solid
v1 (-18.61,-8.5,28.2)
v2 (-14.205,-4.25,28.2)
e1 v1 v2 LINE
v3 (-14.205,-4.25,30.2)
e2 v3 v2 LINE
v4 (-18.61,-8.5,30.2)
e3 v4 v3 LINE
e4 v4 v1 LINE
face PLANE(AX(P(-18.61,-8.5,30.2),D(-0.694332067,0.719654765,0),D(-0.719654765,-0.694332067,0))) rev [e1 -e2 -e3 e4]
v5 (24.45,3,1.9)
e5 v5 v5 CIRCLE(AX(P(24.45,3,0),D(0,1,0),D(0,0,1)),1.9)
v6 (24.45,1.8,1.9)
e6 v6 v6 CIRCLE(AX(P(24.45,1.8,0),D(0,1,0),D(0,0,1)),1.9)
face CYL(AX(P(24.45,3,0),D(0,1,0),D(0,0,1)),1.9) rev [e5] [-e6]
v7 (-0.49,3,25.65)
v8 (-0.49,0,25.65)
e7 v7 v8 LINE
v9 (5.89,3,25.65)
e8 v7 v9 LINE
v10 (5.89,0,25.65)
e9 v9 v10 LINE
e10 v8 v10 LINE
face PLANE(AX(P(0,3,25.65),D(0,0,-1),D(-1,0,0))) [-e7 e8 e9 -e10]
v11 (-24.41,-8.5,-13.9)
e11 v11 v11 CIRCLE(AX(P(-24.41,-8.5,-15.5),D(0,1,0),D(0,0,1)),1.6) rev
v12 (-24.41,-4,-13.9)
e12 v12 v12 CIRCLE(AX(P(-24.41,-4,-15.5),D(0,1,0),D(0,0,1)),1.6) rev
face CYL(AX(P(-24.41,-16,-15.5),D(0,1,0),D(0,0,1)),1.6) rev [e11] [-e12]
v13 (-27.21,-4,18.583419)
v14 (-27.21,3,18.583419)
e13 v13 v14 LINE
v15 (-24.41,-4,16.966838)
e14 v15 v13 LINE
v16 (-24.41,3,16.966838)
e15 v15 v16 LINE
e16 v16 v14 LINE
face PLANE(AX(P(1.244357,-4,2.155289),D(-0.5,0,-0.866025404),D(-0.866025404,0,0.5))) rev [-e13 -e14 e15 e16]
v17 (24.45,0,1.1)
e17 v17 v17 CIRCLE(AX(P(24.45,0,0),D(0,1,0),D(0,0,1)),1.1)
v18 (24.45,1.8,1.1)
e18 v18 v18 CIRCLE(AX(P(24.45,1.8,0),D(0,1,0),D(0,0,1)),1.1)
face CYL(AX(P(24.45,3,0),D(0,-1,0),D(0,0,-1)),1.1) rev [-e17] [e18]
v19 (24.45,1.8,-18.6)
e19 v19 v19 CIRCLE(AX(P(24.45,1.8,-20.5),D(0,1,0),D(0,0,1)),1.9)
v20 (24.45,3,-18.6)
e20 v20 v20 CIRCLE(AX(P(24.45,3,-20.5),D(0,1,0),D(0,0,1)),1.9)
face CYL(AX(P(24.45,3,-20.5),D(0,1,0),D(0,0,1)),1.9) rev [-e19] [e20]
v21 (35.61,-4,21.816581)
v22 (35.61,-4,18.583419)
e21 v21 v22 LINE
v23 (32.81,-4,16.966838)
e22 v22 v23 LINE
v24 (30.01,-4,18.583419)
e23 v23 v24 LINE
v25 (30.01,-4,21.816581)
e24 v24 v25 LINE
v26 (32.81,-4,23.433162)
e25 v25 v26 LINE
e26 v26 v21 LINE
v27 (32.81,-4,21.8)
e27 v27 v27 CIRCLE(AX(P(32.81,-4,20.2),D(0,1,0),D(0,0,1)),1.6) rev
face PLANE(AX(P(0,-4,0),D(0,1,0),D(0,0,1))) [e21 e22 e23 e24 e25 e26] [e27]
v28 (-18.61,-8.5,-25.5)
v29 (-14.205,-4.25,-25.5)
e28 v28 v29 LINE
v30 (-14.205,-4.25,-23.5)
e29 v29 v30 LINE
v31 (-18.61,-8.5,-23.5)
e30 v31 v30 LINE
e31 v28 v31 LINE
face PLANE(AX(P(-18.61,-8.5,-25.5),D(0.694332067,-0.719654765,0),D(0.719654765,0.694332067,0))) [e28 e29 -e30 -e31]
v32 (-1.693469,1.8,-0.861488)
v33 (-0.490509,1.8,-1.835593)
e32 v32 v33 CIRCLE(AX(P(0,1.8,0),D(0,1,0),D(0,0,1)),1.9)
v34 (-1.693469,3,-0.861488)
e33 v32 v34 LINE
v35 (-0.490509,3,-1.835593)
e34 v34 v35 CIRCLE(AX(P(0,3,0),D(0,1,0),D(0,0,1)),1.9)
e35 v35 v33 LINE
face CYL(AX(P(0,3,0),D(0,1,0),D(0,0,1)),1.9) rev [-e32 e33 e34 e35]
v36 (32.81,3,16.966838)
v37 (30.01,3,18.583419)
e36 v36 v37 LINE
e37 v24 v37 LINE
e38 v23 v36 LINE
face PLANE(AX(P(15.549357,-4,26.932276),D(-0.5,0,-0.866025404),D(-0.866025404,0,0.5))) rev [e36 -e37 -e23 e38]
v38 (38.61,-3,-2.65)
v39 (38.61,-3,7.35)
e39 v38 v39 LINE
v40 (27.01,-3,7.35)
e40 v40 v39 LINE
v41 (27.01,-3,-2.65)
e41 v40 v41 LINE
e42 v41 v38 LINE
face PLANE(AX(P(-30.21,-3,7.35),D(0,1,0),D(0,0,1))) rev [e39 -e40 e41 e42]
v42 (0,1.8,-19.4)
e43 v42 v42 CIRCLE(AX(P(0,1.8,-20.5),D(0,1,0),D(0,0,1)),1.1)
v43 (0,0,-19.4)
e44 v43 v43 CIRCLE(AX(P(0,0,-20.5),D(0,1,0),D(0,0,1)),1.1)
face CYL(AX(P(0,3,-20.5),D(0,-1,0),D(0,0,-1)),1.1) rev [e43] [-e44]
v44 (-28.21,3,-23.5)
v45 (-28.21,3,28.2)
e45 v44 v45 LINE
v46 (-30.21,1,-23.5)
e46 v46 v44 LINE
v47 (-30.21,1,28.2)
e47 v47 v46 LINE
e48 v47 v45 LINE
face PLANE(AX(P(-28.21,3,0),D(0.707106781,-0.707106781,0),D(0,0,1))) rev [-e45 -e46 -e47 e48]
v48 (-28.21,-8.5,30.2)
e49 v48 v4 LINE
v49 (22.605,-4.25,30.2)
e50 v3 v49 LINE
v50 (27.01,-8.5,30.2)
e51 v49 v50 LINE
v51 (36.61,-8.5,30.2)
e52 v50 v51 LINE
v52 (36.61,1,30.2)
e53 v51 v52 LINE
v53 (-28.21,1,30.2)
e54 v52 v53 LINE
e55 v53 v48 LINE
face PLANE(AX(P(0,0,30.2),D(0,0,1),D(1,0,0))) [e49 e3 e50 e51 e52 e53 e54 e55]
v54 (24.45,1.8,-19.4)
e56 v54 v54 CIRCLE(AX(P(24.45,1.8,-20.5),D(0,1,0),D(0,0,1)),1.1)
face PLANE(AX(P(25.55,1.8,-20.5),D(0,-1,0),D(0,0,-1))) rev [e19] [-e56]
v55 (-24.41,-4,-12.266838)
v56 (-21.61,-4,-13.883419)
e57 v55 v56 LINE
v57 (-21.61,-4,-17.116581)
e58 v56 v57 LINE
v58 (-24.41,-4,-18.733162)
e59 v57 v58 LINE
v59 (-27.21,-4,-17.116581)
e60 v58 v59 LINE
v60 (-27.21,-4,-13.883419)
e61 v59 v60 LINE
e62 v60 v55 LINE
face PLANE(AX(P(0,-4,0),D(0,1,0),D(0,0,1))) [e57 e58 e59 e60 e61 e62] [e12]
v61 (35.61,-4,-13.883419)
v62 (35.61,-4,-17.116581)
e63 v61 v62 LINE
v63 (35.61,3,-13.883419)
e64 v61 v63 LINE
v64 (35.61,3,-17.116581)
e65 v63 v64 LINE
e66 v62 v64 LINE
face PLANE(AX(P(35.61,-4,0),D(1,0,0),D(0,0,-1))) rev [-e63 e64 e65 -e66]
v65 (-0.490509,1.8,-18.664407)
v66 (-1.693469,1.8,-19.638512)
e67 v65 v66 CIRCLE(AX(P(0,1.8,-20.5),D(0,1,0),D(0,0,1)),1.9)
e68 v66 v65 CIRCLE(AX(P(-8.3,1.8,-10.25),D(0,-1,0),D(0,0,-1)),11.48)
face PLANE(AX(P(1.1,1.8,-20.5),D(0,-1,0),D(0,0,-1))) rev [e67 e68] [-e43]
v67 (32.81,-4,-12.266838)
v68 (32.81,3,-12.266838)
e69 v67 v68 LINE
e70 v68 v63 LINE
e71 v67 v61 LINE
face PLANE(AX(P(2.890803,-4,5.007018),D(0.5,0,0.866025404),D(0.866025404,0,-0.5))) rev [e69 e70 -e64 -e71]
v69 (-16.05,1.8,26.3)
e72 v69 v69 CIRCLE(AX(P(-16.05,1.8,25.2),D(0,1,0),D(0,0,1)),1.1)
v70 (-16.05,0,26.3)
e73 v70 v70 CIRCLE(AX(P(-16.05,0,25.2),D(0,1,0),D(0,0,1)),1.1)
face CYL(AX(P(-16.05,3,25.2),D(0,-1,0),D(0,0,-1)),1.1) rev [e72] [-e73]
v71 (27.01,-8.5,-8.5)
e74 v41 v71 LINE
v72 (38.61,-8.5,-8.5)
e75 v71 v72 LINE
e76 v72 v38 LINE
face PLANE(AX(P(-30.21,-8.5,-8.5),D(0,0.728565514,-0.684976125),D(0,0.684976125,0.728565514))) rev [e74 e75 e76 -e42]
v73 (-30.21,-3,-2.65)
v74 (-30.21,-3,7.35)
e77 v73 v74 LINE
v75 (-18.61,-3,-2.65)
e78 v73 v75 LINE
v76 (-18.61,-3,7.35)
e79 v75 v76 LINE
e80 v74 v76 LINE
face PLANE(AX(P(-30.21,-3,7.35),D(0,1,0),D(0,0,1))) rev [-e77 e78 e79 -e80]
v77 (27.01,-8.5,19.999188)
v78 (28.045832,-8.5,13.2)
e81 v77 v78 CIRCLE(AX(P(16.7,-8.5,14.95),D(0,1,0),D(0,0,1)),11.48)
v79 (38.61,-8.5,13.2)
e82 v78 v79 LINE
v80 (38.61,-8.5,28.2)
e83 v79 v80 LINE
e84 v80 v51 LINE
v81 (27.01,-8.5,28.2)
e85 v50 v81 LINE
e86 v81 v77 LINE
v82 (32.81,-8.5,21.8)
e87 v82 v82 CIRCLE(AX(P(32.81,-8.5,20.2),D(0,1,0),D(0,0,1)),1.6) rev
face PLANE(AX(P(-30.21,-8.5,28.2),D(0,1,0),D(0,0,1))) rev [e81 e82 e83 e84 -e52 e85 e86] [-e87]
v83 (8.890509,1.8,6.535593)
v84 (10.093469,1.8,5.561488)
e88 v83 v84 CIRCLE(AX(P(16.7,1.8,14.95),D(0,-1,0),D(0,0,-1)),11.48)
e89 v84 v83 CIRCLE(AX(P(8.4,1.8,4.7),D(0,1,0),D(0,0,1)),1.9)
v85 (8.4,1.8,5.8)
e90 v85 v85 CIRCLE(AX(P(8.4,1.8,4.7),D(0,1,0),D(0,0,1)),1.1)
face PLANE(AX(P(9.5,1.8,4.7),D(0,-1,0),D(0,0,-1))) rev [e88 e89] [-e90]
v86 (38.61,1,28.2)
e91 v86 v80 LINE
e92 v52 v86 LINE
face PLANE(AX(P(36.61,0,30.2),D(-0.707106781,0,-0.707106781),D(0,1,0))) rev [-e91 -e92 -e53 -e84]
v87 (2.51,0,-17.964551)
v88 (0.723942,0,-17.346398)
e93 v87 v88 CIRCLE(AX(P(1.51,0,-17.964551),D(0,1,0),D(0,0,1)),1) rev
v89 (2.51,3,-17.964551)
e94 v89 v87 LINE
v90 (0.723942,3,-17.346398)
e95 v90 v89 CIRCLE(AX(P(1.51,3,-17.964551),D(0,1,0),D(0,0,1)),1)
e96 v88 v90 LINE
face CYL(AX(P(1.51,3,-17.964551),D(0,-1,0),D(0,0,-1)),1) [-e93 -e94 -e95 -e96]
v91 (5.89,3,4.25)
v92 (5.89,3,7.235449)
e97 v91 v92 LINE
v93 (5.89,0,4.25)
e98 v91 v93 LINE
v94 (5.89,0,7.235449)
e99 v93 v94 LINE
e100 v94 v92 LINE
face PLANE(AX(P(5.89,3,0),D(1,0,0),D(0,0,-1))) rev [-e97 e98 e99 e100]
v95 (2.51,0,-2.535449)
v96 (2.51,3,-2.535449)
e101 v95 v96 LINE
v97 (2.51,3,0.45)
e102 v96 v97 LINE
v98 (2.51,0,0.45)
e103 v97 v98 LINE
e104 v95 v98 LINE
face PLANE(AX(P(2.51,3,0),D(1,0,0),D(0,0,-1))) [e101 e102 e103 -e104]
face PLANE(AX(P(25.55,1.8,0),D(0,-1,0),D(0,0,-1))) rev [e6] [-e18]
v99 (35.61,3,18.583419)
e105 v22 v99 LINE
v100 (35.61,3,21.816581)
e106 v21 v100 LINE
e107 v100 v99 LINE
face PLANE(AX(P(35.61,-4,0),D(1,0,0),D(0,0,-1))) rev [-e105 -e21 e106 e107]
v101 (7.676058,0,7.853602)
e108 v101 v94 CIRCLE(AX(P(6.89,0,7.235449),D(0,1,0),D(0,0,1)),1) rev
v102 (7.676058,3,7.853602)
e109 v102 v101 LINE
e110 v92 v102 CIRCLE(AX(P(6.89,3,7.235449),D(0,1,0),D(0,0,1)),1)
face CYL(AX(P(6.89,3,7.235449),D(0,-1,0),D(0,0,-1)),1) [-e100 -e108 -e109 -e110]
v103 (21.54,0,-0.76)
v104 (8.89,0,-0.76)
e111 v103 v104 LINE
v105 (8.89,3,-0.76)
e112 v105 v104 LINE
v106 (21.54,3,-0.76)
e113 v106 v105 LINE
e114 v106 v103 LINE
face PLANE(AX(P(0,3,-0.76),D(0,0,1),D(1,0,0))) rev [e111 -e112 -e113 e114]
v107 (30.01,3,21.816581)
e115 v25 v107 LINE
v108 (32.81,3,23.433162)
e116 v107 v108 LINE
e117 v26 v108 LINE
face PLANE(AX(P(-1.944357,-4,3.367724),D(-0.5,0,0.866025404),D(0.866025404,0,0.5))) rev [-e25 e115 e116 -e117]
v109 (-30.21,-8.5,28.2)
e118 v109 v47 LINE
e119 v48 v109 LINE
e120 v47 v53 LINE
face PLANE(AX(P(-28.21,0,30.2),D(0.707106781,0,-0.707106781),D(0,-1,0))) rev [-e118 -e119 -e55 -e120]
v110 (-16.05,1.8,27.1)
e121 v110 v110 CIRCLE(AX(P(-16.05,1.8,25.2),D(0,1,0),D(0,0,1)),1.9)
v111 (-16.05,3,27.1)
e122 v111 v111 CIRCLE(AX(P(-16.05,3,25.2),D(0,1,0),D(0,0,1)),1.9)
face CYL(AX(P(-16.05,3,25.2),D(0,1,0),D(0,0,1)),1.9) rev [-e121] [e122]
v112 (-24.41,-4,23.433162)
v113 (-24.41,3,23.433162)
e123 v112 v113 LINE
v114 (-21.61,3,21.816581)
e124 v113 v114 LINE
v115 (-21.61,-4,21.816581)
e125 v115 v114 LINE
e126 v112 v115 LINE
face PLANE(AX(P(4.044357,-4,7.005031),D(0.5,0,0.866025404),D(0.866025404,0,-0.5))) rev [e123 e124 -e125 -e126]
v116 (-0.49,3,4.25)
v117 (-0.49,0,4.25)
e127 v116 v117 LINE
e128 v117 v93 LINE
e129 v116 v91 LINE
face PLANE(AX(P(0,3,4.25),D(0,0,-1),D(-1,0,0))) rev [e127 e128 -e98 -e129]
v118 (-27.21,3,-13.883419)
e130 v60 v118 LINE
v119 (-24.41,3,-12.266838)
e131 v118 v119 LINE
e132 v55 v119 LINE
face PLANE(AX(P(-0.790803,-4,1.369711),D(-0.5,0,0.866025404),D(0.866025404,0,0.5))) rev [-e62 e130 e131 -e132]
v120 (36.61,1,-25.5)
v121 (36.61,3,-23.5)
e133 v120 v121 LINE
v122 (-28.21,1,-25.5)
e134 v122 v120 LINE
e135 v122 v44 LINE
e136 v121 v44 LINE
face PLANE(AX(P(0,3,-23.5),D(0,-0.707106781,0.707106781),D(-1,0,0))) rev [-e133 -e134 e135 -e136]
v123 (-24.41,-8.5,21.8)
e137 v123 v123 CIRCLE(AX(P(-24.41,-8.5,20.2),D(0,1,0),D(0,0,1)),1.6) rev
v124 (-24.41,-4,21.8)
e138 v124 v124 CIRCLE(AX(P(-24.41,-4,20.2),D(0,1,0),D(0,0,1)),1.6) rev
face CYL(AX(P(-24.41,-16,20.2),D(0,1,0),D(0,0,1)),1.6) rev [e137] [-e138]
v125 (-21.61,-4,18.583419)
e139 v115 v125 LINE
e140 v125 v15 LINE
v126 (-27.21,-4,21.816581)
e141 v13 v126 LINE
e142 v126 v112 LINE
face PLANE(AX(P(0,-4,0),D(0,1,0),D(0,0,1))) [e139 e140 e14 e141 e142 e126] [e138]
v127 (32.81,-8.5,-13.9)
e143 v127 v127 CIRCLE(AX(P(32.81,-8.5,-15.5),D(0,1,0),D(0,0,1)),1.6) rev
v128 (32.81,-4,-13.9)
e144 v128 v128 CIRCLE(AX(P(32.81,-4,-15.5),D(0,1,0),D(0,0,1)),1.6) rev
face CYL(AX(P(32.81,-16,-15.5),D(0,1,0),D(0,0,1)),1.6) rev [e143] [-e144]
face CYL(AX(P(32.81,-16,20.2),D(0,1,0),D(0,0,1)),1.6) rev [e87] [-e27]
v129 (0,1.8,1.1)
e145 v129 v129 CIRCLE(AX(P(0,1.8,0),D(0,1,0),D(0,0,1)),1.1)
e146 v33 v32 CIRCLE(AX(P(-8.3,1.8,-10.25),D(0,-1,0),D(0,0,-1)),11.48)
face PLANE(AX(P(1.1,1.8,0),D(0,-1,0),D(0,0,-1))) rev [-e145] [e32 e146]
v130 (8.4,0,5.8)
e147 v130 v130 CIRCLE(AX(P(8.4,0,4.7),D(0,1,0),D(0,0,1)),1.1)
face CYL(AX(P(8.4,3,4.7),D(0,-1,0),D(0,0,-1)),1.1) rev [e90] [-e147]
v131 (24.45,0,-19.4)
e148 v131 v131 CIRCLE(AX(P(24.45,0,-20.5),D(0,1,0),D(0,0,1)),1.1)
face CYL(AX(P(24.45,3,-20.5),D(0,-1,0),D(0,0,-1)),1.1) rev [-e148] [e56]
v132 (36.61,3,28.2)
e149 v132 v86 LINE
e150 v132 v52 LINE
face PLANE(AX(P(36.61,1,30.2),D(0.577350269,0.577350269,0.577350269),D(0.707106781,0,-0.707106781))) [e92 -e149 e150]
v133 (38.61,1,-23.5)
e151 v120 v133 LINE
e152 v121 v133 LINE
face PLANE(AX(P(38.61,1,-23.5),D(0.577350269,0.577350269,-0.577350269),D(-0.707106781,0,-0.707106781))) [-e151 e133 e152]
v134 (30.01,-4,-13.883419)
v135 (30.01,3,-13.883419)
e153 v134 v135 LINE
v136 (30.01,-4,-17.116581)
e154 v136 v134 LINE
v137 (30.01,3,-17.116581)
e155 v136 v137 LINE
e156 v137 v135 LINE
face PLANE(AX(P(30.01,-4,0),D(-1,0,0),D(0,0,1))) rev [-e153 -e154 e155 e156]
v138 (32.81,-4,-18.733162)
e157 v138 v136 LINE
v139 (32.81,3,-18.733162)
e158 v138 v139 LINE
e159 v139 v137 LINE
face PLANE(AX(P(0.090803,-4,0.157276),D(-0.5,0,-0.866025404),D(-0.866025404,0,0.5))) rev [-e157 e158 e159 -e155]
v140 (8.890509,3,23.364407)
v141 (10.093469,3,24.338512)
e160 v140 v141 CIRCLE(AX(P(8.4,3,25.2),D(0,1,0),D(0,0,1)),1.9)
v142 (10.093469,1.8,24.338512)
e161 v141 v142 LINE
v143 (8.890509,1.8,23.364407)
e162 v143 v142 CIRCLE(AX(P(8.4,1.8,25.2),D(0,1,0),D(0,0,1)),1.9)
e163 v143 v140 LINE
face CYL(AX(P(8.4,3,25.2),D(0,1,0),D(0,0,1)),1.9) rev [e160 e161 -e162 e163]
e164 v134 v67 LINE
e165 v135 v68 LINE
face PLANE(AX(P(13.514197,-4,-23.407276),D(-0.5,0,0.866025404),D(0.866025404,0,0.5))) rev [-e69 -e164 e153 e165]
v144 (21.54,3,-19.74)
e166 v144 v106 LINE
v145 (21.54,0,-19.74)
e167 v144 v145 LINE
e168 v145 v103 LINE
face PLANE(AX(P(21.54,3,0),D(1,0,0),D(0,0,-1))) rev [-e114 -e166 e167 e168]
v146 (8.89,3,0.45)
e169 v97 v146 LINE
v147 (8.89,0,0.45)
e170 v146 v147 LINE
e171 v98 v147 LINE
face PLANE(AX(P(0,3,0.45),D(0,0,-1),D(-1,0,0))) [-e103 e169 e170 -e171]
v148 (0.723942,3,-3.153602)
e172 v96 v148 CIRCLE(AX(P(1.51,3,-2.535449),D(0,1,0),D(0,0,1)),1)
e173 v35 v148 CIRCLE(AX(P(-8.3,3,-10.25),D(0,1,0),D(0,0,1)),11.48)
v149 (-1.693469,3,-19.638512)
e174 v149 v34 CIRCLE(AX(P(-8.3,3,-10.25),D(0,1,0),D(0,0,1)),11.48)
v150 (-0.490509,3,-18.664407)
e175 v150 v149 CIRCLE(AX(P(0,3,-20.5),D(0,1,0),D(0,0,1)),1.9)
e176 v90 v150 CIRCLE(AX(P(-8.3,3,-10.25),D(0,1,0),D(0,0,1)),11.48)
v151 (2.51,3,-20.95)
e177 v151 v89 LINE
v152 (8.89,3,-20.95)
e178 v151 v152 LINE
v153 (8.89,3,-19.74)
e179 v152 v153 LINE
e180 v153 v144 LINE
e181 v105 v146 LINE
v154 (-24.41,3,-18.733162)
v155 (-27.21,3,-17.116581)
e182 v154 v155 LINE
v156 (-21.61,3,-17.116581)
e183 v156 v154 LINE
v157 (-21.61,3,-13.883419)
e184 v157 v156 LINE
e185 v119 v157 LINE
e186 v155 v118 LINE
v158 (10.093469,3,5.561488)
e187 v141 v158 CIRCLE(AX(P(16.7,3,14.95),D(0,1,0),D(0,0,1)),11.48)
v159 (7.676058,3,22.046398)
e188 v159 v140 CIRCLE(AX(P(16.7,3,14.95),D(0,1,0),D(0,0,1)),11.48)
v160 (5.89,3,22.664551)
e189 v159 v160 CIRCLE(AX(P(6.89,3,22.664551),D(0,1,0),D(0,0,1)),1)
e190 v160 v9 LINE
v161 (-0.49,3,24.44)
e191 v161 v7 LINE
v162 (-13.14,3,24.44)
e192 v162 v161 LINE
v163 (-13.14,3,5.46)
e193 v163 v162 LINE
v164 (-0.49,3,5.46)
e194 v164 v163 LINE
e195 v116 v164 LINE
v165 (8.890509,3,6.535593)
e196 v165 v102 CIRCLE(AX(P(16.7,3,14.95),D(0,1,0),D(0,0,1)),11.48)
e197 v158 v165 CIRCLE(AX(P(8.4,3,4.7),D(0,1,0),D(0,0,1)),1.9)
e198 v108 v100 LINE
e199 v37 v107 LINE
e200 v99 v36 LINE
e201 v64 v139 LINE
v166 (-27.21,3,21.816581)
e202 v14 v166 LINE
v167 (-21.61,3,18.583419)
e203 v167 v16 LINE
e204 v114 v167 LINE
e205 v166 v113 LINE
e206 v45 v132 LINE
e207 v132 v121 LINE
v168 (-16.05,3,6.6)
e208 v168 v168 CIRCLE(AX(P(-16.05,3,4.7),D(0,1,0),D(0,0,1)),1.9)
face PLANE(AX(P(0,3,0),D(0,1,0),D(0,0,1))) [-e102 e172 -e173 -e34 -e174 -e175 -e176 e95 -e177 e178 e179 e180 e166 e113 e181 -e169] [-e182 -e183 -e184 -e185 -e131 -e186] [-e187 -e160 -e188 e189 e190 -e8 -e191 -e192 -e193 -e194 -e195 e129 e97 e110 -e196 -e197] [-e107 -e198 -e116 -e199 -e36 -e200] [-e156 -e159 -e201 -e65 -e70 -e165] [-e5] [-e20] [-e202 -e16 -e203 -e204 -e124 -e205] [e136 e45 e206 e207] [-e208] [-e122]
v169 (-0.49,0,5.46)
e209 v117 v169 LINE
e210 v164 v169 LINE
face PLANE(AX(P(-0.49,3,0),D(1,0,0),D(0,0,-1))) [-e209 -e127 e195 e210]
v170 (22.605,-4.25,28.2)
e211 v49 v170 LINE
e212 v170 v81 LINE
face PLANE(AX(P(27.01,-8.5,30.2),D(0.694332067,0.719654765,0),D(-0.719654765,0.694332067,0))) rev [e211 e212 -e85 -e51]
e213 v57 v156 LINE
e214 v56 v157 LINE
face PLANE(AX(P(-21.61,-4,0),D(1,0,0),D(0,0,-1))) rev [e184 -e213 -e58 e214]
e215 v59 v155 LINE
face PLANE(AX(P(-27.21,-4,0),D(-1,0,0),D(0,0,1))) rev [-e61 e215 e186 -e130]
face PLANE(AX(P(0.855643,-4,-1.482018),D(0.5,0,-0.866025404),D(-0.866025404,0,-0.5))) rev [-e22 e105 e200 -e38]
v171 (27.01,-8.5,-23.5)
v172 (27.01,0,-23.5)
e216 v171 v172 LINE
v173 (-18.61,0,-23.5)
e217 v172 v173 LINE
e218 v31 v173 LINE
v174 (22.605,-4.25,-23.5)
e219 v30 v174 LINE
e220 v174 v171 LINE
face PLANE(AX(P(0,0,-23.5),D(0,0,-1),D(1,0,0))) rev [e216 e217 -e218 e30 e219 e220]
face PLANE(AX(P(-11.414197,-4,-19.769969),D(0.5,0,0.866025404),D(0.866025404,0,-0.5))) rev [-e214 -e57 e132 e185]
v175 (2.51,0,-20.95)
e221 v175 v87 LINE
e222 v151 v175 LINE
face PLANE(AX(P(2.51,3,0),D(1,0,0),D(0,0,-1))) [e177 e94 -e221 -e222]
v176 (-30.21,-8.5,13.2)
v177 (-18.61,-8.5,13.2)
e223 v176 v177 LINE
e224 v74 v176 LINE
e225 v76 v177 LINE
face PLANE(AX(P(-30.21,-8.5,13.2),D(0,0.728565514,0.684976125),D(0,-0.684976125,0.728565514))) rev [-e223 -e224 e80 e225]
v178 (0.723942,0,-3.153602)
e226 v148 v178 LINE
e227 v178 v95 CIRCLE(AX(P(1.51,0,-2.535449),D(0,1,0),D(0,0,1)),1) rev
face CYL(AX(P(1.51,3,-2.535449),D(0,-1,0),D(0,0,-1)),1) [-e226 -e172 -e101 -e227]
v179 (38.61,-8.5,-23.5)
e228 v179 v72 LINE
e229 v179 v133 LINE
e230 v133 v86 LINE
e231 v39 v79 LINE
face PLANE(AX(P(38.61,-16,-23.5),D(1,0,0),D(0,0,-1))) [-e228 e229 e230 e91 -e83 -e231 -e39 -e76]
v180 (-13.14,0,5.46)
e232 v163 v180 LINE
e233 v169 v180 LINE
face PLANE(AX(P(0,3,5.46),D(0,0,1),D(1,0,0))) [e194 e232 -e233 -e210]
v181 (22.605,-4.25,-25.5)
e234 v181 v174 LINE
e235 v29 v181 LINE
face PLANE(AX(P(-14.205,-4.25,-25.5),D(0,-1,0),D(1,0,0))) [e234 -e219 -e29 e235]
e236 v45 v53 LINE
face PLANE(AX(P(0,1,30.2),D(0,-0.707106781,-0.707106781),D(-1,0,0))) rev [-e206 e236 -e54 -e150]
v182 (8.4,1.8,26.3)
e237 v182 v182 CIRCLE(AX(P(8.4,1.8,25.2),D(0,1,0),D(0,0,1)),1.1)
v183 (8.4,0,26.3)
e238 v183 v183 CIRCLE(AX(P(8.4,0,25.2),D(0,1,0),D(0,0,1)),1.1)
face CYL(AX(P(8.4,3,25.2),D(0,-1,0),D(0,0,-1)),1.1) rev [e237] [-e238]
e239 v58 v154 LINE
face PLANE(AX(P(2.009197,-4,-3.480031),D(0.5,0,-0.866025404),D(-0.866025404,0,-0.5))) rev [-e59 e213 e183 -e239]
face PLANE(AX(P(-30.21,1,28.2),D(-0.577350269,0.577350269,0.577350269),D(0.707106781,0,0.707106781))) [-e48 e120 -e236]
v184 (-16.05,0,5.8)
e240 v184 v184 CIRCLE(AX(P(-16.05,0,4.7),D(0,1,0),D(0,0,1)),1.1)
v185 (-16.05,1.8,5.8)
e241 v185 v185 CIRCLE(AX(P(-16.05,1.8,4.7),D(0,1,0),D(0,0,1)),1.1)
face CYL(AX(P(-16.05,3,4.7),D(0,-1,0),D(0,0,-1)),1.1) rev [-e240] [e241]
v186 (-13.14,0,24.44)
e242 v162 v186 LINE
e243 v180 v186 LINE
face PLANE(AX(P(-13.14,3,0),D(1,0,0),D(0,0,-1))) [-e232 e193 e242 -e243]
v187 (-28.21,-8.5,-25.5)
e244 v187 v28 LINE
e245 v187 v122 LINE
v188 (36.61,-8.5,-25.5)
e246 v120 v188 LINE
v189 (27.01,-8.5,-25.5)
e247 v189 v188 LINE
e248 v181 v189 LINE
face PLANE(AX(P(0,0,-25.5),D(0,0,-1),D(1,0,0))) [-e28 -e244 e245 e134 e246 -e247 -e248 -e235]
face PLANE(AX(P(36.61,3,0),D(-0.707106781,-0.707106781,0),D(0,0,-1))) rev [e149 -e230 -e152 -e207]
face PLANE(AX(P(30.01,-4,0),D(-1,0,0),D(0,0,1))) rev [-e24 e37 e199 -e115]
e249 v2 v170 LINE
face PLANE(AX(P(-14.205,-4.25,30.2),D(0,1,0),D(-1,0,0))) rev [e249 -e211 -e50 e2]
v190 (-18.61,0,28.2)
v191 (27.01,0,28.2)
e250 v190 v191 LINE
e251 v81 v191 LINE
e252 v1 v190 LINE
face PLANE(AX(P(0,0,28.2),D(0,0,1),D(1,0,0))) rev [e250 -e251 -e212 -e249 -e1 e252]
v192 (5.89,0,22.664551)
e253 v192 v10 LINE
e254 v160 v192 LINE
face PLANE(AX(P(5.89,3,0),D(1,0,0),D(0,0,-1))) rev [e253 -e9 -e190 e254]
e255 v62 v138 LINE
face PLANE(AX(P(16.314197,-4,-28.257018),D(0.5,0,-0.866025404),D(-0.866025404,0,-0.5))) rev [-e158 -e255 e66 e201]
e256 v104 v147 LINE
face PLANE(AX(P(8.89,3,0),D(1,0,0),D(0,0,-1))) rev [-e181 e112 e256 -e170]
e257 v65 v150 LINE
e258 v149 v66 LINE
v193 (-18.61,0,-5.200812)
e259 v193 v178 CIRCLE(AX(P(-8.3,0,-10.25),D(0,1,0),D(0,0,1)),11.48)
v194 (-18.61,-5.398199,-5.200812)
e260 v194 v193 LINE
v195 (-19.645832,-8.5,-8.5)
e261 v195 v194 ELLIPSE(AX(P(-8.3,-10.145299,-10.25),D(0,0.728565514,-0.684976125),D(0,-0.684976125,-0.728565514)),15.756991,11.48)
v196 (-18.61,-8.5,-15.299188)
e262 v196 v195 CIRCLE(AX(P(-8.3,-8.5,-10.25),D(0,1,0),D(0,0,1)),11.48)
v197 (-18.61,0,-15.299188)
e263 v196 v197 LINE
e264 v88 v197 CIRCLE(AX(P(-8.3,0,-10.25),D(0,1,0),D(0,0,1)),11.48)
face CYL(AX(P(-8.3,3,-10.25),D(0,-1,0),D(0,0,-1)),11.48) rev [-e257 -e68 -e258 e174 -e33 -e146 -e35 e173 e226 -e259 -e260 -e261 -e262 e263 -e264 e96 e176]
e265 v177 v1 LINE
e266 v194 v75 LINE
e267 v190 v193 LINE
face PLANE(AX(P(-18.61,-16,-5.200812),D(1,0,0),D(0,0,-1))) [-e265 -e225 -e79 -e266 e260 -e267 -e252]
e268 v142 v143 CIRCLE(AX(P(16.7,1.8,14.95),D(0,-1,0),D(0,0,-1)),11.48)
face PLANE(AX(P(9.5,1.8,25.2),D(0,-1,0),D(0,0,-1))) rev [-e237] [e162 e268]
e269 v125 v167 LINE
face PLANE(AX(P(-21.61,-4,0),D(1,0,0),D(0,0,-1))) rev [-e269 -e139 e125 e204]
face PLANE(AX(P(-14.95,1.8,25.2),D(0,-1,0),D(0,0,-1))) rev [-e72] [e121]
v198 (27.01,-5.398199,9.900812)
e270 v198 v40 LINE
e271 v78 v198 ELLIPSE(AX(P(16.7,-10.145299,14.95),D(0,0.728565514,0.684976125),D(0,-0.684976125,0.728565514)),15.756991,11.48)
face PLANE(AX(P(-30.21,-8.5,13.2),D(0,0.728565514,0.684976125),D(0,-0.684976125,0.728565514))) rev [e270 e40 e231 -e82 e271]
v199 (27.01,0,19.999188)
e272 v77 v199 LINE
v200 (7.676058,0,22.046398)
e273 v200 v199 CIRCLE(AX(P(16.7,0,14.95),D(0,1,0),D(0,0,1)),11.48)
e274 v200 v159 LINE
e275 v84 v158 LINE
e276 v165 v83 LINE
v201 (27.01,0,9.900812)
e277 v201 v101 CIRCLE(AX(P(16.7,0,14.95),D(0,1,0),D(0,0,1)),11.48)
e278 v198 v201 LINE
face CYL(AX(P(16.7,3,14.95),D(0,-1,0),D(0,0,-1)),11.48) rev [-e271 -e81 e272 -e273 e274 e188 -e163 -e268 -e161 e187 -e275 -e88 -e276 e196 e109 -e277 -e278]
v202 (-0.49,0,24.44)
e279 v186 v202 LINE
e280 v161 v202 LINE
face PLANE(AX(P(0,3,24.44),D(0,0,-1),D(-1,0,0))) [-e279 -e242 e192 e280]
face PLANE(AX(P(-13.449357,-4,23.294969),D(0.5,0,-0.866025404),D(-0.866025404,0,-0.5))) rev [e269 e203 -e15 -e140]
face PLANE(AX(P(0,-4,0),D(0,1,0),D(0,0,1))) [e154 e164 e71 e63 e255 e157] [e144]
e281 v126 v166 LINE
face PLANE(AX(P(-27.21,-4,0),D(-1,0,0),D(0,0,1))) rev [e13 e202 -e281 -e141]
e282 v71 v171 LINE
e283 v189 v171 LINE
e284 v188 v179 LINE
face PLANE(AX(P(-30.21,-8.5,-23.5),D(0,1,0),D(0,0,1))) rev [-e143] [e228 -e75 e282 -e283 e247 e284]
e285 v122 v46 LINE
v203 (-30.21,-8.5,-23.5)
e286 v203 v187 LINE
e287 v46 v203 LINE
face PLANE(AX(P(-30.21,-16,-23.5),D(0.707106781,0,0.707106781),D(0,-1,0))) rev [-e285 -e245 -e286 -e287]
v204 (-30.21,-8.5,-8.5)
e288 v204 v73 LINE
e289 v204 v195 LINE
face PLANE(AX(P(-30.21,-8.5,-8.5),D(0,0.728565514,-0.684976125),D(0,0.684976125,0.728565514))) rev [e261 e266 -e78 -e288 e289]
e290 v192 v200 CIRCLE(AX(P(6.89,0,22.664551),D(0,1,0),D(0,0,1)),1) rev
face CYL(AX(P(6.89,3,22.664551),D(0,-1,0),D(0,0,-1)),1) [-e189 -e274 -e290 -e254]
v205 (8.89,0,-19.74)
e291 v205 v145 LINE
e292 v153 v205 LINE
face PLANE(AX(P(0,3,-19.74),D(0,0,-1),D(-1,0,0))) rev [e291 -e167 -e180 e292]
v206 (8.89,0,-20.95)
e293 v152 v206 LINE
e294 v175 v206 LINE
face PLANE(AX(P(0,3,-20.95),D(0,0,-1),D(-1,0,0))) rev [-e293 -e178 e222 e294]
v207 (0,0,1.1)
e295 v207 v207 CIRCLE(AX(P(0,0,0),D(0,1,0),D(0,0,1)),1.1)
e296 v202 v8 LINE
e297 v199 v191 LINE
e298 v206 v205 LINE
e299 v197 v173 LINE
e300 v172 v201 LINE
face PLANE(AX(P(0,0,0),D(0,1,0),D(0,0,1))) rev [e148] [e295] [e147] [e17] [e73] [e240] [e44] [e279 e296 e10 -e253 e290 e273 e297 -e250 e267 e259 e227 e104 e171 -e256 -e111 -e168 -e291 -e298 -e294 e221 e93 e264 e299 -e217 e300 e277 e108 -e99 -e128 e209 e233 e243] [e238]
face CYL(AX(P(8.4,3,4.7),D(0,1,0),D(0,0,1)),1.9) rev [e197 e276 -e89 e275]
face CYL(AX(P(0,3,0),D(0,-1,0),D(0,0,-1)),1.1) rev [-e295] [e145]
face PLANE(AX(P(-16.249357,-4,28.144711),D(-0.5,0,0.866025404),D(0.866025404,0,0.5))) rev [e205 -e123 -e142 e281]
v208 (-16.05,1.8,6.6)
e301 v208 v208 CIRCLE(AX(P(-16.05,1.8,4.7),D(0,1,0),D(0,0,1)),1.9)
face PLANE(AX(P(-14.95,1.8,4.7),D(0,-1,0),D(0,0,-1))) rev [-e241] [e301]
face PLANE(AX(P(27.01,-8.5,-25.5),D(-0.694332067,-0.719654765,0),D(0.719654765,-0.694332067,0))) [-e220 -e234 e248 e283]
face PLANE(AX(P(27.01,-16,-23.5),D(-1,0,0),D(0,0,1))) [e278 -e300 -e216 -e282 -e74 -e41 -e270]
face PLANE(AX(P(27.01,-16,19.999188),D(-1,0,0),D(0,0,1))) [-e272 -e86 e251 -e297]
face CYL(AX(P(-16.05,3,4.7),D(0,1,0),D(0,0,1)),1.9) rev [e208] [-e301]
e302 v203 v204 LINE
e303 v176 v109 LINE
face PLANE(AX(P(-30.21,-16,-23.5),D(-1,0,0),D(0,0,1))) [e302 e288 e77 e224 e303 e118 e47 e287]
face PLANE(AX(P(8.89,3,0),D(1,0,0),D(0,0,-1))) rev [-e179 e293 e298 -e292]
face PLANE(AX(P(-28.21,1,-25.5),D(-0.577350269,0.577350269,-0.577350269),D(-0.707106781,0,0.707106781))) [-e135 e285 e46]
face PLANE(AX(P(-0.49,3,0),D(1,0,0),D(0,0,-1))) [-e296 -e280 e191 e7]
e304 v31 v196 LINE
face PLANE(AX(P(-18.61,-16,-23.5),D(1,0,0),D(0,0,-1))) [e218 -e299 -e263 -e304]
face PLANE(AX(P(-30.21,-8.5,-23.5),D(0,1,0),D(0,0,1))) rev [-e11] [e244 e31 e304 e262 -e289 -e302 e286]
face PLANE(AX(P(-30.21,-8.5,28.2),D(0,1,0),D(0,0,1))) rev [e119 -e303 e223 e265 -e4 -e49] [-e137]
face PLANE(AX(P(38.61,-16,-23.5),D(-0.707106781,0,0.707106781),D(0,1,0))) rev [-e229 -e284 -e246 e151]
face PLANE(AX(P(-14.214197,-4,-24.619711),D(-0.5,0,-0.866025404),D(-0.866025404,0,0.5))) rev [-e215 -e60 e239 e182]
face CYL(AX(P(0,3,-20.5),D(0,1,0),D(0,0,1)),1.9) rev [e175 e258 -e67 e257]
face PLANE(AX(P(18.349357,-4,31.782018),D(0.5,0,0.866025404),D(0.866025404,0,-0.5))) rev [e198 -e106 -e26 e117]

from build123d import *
from build123d.topology import SkipClean

# Parameters (mm, degrees)
ESQUISSE1_W                                        = 50.5
ESQUISSE1_H                                        = 51.7
ESQUISSE1_R                                        = 1.1
BOSS_EXTRU_1_DEPTH                                 = 3
CONG_1_R                                           = 1
CHAMBRAGE_POUR_VIS_SIX_PANS_CREUX_M1_6_D           = 2.2
CHAMBRAGE_POUR_VIS_SIX_PANS_CREUX_M1_6_CBORE_D     = 3.8
CHAMBRAGE_POUR_VIS_SIX_PANS_CREUX_M1_6_CBORE_DEPTH = 1.2
BOSS_EXTRU_2_START                                 = -19
ESQUISSE4_R                                        = 1.6
BOSS_EXTRU_2_DEPTH                                 = 19
ENL_V_START                                        = -19
ENL_V_MAT_EXTRU_1_DEPTH                            = 7
ENL_V_MAT_EXTRU_2_DEPTH                            = 77.075175977
ENL_V_MAT_EXTRU_2_DEPTH_BACK                       = 77.075175977
BOSS_EXTRU_3_DEPTH                                 = 2
CHANFREIN1_SIZE                                    = 2


with BuildPart() as part:
    # Esquisse1 → Boss.-Extru.1 (new body)
    with BuildSketch(Plane(origin=(0, 0, 0), x_dir=(1, 0, 0), z_dir=(0, 1, 0))):
        with Locations((4.2, -2.35)):
            Rectangle(ESQUISSE1_W, ESQUISSE1_H)
        with Locations(Location((-16.05, -25.2, 0), (0, 0, 270))):
            Circle(ESQUISSE1_R, mode=Mode.SUBTRACT)
        with Locations(Location((-16.05, -4.7, 0), (0, 0, 270))):
            Circle(ESQUISSE1_R, mode=Mode.SUBTRACT)
        with Locations(Location((8.4, -25.2, 0), (0, 0, 270))):
            Circle(ESQUISSE1_R, mode=Mode.SUBTRACT)
        with BuildLine():
            Line((-0.49, -5.46), (-0.49, -4.25))
            Line((-0.49, -4.25), (5.89, -4.25))
            Line((5.89, -4.25), (5.89, -11.085507795))
            ThreePointArc((5.89, -11.085507795), (18.661071136, -3.638740123), (28.18, -14.95))
            ThreePointArc((28.18, -14.95), (18.661071136, -26.261259877), (5.89, -18.814492205))
            Line((5.89, -18.814492205), (5.89, -25.65))
            Line((5.89, -25.65), (-0.49, -25.65))
            Line((-0.49, -25.65), (-0.49, -24.44))
            Line((-0.49, -24.44), (-13.14, -24.44))
            Line((-13.14, -24.44), (-13.14, -5.46))
            Line((-13.14, -5.46), (-0.49, -5.46))
        make_face(mode=Mode.SUBTRACT)
        with Locations(Location((8.4, -4.7, 0), (0, 0, 270))):
            Circle(ESQUISSE1_R, mode=Mode.SUBTRACT)
        with Locations(Location((0, 0, 0), (0, 0, 270))):
            Circle(ESQUISSE1_R, mode=Mode.SUBTRACT)
        with BuildLine():
            Line((8.89, 20.95), (8.89, 19.74))
            Line((8.89, 19.74), (21.54, 19.74))
            Line((21.54, 19.74), (21.54, 0.76))
            Line((21.54, 0.76), (8.89, 0.76))
            Line((8.89, 0.76), (8.89, -0.45))
            Line((8.89, -0.45), (2.51, -0.45))
            Line((2.51, -0.45), (2.51, 6.385507795))
            ThreePointArc((2.51, 6.385507795), (-19.78, 10.25), (2.51, 14.114492205))
            Line((2.51, 14.114492205), (2.51, 20.95))
            Line((2.51, 20.95), (8.89, 20.95))
        make_face(mode=Mode.SUBTRACT)
        with Locations(Location((0, 20.5, 0), (0, 0, 270))):
            Circle(ESQUISSE1_R, mode=Mode.SUBTRACT)
        with Locations(Location((24.45, 0, 0), (0, 0, 270))):
            Circle(ESQUISSE1_R, mode=Mode.SUBTRACT)
        with Locations(Location((24.45, 20.5, 0), (0, 0, 270))):
            Circle(ESQUISSE1_R, mode=Mode.SUBTRACT)
    extrude(amount=BOSS_EXTRU_1_DEPTH)

    # Congé1
    cong_1_edges = [part.edges().sort_by_distance(p)[0] for p in [
        (2.51, 1.5, -6.385507795),
        (2.51, 1.5, -14.114492205),
        (5.89, 1.5, 11.085507795),
        (5.89, 1.5, 18.814492205),
    ]]
    fillet(cong_1_edges, radius=CONG_1_R)

    # Chambrage pour vis à six pans creux M1.61 (through all)
    with Locations(Plane(origin=(0, 3, 0), x_dir=(1, 0, 0), z_dir=(0, 1, 0))):
        with Locations((-16.05, -4.7), (-16.05, -25.2), (8.4, -25.2), (8.4, -4.7), (0, 0), (0, 20.5), (24.45, 20.5), (24.45, 0)):
            CounterBoreHole(CHAMBRAGE_POUR_VIS_SIX_PANS_CREUX_M1_6_D / 2, CHAMBRAGE_POUR_VIS_SIX_PANS_CREUX_M1_6_CBORE_D / 2, CHAMBRAGE_POUR_VIS_SIX_PANS_CREUX_M1_6_CBORE_DEPTH)

    # Esquisse4 → Boss.-Extru.2 (add)
    # profile 1 of 2: a face of its own
    with SkipClean():  # the faces are left unmerged after this step: merging them gives an invalid solid
        with BuildSketch(Plane(origin=(0, 3, 0), x_dir=(1, 0, 0), z_dir=(0, 1, 0)).offset(BOSS_EXTRU_2_START)):
            with BuildLine():
                Line((-18.61, 23.5), (-30.21, 23.5))
                Line((-30.21, 23.5), (-30.21, -28.2))
                Line((-30.21, -28.2), (-18.61, -28.2))
                Line((-18.61, -28.2), (-18.61, 5.200811946))
                ThreePointArc((-18.61, 5.200811946), (-19.78, 10.25), (-18.61, 15.299188054))
                Line((-18.61, 15.299188054), (-18.61, 23.5))
            make_face()
            with Locations(Location((-24.41, 15.5, 0), (0, 0, 270))):
                Circle(ESQUISSE4_R, mode=Mode.SUBTRACT)
            with Locations(Location((-24.41, -20.2, 0), (0, 0, 90))):
                Circle(ESQUISSE4_R, mode=Mode.SUBTRACT)
        # profile 2 of 2: a face of its own
        with BuildSketch(Plane(origin=(0, 3, 0), x_dir=(1, 0, 0), z_dir=(0, 1, 0)).offset(BOSS_EXTRU_2_START)):
            with BuildLine():
                Line((27.01, 23.5), (38.61, 23.5))
                Line((38.61, 23.5), (38.61, -28.2))
                Line((38.61, -28.2), (27.01, -28.2))
                Line((27.01, -28.2), (27.01, -19.999188054))
                ThreePointArc((27.01, -19.999188054), (28.18, -14.95), (27.01, -9.900811946))
                Line((27.01, -9.900811946), (27.01, 23.5))
            make_face()
            with Locations(Location((32.81, 15.5, 0), (0, 0, 90))):
                Circle(ESQUISSE4_R, mode=Mode.SUBTRACT)
            with Locations(Location((32.81, -20.2, 0), (0, 0, 270))):
                Circle(ESQUISSE4_R, mode=Mode.SUBTRACT)
        extrude(amount=BOSS_EXTRU_2_DEPTH)

    # Esquisse5 → Enlèv. mat.-Extru.1 (cut)
    with SkipClean():  # the faces are left unmerged after this step: merging them gives an invalid solid
        with BuildSketch(Plane.XZ.offset(16).offset(ENL_V_START)):
            Polygon((-24.41, 23.433161507), (-27.21, 21.816580754), (-27.21, 18.583419246), (-24.41, 16.966838493), (-21.61, 18.583419246), (-21.61, 21.816580754), align=None)
            Polygon((-24.41, -12.266838493), (-27.21, -13.883419246), (-27.21, -17.116580754), (-24.41, -18.733161507), (-21.61, -17.116580754), (-21.61, -13.883419246), align=None)
            Polygon((32.81, -12.266838493), (30.01, -13.883419246), (30.01, -17.116580754), (32.81, -18.733161507), (35.61, -17.116580754), (35.61, -13.883419246), align=None)
            Polygon((32.81, 23.433161507), (30.01, 21.816580754), (30.01, 18.583419246), (32.81, 16.966838493), (35.61, 18.583419246), (35.61, 21.816580754), align=None)
        extrude(amount=ENL_V_MAT_EXTRU_1_DEPTH, mode=Mode.SUBTRACT)

    # Esquisse6 → Enlèv. mat.-Extru.2 (cut, two sides: drawn at the far end of the back side and taken through both)
    with SkipClean():  # the faces are left unmerged after this step: merging them gives an invalid solid
        with BuildSketch(Plane(origin=(38.61, 0, 0), x_dir=(0, 0, -1), z_dir=(1, 0, 0)).offset(-ENL_V_MAT_EXTRU_2_DEPTH_BACK)):
            Polygon((-28.2, -8.5), (-13.2, -8.5), (-7.35, -3), (2.65, -3), (8.5, -8.5), (23.5, -8.5), (23.5, -16), (-28.2, -16), align=None)
        extrude(amount=ENL_V_MAT_EXTRU_2_DEPTH + ENL_V_MAT_EXTRU_2_DEPTH_BACK, mode=Mode.SUBTRACT)

    # Esquisse7 → Boss.-Extru.3 (add)
    with SkipClean():  # the faces are left unmerged after this step: merging them gives an invalid solid
        with BuildSketch(Plane.XY.offset(28.2)):
            Polygon((-18.61, -8.5), (-14.205, -4.25), (22.605, -4.25), (27.01, -8.5), (38.61, -8.5), (38.61, 3), (-30.21, 3), (-30.21, -8.5), align=None)
        boss_extru_3 = extrude(amount=BOSS_EXTRU_3_DEPTH)

    # Symétrie1: Boss.-Extru.3 across plane
    with SkipClean():  # the faces are left unmerged after this step: merging them gives an invalid solid
        add(boss_extru_3.mirror(Plane.XY.offset(2.35)))

    # Chanfrein1
    chanfrein1_edges = [part.edges().sort_by_distance(p)[0] for p in [
        (-30.21, 3, 2.35),
        (38.61, 3, 2.35),
        (38.61, -2.75, 30.2),
        (4.2, 3, 30.2),
        (-30.21, -2.75, 30.2),
        (-30.21, -2.75, -25.5),
        (4.2, 3, -25.5),
        (38.61, -2.75, -25.5),
    ]]
    chamfer(chanfrein1_edges, length=CHANFREIN1_SIZE - 0.0001)  # a hair under: the kernel refuses the full size


solid = part.part
